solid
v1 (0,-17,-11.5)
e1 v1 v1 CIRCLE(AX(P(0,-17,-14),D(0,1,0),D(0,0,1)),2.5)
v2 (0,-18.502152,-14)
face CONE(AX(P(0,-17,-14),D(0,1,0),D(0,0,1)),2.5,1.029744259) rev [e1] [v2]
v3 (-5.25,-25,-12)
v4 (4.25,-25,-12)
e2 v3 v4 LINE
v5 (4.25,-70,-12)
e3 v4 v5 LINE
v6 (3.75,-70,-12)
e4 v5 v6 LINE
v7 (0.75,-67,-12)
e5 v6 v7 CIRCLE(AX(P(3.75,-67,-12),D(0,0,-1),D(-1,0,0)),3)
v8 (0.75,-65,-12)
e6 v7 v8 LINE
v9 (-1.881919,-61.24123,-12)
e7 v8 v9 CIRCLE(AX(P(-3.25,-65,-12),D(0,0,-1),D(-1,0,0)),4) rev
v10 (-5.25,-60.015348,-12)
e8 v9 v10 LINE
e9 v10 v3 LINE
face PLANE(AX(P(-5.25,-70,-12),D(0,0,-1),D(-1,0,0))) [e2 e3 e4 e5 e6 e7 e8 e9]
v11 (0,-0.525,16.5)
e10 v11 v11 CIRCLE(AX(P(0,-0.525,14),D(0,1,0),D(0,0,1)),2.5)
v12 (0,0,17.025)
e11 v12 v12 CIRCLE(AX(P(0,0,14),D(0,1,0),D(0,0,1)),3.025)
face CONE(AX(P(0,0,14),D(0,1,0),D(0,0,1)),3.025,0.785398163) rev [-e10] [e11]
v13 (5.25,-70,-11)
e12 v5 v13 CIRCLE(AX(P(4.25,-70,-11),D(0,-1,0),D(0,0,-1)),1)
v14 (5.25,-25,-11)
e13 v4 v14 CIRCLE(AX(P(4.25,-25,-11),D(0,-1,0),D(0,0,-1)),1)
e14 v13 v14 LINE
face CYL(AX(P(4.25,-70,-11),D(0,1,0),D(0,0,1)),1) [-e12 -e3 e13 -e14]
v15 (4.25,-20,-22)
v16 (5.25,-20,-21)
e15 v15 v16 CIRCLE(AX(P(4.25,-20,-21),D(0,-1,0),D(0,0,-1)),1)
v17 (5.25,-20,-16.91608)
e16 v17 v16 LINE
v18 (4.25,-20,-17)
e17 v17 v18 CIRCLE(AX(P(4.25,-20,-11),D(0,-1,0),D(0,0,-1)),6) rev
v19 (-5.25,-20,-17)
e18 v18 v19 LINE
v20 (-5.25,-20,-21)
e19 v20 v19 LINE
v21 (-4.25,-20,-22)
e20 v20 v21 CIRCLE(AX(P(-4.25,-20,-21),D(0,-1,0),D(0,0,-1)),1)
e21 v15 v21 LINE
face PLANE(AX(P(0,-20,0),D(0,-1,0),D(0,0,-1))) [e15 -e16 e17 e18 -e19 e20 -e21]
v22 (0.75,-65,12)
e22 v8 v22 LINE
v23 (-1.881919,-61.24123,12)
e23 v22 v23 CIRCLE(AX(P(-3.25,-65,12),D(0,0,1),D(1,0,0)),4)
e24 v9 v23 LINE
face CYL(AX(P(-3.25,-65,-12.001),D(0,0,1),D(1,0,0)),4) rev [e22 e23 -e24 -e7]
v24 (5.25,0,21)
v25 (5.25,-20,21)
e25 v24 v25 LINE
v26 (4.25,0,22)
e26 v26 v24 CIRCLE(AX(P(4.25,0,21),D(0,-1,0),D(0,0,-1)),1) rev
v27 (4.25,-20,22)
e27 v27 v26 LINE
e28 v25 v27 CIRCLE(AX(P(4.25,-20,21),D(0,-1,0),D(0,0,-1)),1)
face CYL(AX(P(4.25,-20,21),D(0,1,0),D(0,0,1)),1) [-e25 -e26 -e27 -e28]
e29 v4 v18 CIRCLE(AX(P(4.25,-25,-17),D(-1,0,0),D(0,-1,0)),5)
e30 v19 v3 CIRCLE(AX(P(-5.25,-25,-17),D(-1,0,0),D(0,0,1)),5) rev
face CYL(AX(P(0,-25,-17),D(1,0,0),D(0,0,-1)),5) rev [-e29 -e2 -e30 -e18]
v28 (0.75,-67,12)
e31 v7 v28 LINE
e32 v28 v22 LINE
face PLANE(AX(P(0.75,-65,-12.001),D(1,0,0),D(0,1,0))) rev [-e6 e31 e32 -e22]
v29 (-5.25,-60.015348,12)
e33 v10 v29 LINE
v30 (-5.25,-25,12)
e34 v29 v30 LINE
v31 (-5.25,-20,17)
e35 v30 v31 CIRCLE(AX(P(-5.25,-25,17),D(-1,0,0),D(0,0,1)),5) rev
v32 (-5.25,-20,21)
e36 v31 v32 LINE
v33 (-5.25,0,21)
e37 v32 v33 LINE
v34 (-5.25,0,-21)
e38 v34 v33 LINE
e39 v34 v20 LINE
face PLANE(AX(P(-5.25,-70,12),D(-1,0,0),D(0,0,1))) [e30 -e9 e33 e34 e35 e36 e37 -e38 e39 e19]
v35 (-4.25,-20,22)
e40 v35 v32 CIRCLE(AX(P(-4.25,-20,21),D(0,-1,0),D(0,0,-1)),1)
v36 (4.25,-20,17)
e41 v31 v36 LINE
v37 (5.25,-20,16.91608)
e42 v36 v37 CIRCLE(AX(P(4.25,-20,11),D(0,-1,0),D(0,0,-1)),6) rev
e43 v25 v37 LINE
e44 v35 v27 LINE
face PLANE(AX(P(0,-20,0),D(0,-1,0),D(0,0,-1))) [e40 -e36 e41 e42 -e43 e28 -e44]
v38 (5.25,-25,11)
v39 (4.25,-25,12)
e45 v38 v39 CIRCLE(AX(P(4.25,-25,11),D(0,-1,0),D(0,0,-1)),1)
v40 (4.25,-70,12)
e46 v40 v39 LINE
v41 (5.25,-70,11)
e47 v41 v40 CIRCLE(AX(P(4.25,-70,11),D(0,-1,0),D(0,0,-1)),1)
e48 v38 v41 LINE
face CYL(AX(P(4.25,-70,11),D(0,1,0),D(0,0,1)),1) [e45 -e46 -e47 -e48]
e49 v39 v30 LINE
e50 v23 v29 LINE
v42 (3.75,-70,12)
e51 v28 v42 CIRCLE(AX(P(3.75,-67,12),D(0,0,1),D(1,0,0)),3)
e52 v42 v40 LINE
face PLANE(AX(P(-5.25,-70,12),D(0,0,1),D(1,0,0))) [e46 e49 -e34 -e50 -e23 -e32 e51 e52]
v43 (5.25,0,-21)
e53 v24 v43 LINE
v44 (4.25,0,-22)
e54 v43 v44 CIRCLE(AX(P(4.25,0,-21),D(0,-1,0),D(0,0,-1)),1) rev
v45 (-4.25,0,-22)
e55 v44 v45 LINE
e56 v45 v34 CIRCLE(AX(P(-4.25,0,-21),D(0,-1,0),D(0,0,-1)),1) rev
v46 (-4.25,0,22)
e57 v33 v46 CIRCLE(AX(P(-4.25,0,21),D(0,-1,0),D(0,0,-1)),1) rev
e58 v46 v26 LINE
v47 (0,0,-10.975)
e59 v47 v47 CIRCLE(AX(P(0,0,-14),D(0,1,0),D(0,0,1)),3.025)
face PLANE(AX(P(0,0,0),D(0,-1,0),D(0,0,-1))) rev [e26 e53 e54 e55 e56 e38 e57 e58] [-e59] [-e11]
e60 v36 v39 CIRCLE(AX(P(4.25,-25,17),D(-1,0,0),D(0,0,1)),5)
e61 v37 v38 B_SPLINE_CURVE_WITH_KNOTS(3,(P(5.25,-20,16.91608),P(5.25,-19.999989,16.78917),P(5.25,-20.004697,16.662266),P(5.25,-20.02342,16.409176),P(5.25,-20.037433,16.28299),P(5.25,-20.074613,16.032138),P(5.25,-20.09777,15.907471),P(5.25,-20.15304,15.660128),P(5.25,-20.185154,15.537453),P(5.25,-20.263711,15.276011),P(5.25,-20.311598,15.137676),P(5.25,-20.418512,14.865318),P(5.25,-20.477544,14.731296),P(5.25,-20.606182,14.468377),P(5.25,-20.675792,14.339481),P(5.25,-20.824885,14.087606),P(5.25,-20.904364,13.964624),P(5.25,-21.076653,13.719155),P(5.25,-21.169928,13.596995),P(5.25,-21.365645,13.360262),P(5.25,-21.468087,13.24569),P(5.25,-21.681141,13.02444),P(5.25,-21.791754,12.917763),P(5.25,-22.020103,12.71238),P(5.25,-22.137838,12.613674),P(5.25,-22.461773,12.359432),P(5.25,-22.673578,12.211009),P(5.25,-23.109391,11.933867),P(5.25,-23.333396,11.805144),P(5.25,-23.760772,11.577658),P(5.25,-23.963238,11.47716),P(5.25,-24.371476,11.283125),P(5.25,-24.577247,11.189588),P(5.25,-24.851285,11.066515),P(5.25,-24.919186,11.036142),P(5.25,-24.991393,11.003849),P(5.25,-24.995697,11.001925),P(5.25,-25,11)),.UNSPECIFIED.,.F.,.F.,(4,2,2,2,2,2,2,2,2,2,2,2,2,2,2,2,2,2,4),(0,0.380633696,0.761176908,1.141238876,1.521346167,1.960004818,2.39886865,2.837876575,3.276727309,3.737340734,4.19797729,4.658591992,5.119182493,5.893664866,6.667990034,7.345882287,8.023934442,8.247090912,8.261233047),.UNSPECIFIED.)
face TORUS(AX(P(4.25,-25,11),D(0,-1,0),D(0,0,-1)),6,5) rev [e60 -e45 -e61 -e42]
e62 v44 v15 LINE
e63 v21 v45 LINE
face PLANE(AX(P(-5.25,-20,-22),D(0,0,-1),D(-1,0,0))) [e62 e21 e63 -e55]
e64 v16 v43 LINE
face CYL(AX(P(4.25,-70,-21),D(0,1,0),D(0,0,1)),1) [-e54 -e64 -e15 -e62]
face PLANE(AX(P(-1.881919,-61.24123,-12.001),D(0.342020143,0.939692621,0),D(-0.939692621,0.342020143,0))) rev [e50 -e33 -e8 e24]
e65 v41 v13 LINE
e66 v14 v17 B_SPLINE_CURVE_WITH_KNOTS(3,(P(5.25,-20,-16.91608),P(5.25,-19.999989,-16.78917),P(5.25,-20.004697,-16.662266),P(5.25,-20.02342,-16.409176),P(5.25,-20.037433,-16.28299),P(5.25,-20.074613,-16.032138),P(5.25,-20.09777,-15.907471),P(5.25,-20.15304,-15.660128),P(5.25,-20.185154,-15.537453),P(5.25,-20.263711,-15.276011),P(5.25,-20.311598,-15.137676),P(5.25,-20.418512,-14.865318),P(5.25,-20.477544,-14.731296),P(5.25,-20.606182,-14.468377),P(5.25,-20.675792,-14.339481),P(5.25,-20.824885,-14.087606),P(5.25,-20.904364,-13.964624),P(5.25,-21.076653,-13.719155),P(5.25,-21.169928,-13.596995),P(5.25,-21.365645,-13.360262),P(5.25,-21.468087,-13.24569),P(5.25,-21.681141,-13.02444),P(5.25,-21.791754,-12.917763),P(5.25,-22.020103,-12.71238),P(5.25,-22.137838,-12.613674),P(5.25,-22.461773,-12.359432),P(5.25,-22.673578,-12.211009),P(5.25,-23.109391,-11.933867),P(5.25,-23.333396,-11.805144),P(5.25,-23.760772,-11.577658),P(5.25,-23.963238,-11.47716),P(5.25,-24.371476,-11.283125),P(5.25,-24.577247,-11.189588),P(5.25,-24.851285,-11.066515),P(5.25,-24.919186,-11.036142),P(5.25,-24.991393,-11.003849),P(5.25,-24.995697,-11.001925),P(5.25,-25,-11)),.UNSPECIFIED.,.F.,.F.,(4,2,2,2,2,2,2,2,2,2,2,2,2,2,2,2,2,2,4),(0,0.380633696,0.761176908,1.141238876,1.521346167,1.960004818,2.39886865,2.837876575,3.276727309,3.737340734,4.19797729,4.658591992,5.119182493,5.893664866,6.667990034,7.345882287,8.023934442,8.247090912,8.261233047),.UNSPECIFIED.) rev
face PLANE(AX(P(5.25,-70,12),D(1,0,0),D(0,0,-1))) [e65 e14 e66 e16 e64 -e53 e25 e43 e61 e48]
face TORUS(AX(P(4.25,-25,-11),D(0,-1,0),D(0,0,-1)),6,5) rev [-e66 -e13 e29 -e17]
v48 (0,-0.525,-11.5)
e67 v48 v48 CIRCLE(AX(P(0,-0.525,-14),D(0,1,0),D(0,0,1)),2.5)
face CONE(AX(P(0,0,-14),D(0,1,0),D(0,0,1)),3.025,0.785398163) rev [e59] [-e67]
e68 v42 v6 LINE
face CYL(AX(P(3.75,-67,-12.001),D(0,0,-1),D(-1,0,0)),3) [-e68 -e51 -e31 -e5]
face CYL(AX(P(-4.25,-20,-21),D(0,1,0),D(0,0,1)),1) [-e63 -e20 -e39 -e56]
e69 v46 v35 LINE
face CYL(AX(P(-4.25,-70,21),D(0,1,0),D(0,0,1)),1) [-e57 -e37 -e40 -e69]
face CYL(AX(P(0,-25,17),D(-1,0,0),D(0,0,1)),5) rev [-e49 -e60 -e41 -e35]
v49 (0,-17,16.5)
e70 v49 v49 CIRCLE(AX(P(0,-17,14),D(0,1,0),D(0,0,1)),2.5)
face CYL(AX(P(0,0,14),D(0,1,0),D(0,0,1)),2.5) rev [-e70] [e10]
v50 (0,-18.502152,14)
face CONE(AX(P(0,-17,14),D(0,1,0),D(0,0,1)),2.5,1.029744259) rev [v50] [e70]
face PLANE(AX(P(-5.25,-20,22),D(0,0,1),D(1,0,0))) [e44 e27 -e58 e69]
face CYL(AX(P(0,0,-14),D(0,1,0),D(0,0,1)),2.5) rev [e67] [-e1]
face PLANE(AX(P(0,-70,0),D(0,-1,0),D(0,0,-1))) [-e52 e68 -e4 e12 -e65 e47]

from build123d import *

# Parameters (mm, degrees)
SKETCH1_W                   = 10.5
SKETCH1_H                   = 24
BOSS_EXTRUDE1_DEPTH         = 70
CUT_EXTRUDE1_REACH          = 76.186
FILLET1_R                   = 3
SKETCH3_W                   = 10.5
SKETCH3_H                   = 44
BOSS_EXTRUDE2_DEPTH         = 20
FILLET2_R                   = 1
M6_TAPPED_HOLE1_D           = 5
M6_TAPPED_HOLE1_DEPTH       = 17
M6_TAPPED_HOLE1_CSINK_D     = 6.05
M6_TAPPED_HOLE1_CSINK_ANGLE = 90
M6_TAPPED_HOLE1_TIP         = 1.502151548
FILLET3_R                   = 5
FILLET4_R                   = 1


with BuildPart() as part:
    # Sketch1 → Boss-Extrude1 (new body)
    with BuildSketch(Plane(origin=(0, 0, 0), x_dir=(1, 0, 0), z_dir=(0, 1, 0))):
        Rectangle(SKETCH1_W, SKETCH1_H)
    extrude(amount=-BOSS_EXTRUDE1_DEPTH)

    # Sketch2 → Cut-Extrude1 (cut, up to next)
    with BuildSketch(Plane.XY.offset(12), mode=Mode.PRIVATE) as cut_extrude1_sk1:
        with BuildLine():
            Line((-1.881919427, -61.241229517), (-5.25, -60.015348442))
            Line((-5.25, -60.015348442), (-5.25, -70))
            Line((-5.25, -70), (0.75, -70))
            Line((0.75, -70), (0.75, -65))
            ThreePointArc((0.75, -65), (0.026608177, -62.705694255), (-1.881919427, -61.241229517))
        make_face()
    cut_extrude1_tool1 = extrude(cut_extrude1_sk1.sketch, amount=-CUT_EXTRUDE1_REACH, mode=Mode.PRIVATE) & part.part
    add(cut_extrude1_tool1.solids().sort_by_distance((-2.443278, -65.612177, 12))[0], mode=Mode.SUBTRACT)

    # Fillet1
    fillet1_edges = [part.edges().sort_by_distance(p)[0] for p in [
        (0.75, -70, 0),
    ]]
    fillet(fillet1_edges, radius=FILLET1_R)

    # Sketch3 → Boss-Extrude2 (add)
    with BuildSketch(Plane(origin=(0, 0, 0), x_dir=(1, 0, 0), z_dir=(0, 1, 0))):
        Rectangle(SKETCH3_W, SKETCH3_H)
    extrude(amount=-BOSS_EXTRUDE2_DEPTH)

    # Fillet2
    fillet2_edges = [part.edges().sort_by_distance(p)[0] for p in [
        (5.25, -45, 12),
        (5.25, -45, -12),
    ]]
    fillet(fillet2_edges, radius=FILLET2_R)

    # M6 Tapped Hole1
    with Locations(Plane(origin=(0, 0, 0), x_dir=(1, 0, 0), z_dir=(0, 1, 0))):
        with Locations((0, 14), (0, -14)):
            CounterSinkHole(M6_TAPPED_HOLE1_D / 2, M6_TAPPED_HOLE1_CSINK_D / 2, depth=M6_TAPPED_HOLE1_DEPTH, counter_sink_angle=M6_TAPPED_HOLE1_CSINK_ANGLE)
            with Locations((0, 0, -(M6_TAPPED_HOLE1_DEPTH + M6_TAPPED_HOLE1_TIP / 2))):  # 118° drill point
                Cone(0, M6_TAPPED_HOLE1_D / 2, M6_TAPPED_HOLE1_TIP, mode=Mode.SUBTRACT)

    # Fillet3
    # the kernel refuses this fillet: 5 mm, written as the material it adds along each edge
    with BuildSketch(Plane(origin=(4.25, -20, 12), x_dir=(0, -1, 0), z_dir=(-1, 0, 0)), Plane(origin=(-5.25, -20, -12), x_dir=(0, -1, 0), z_dir=(1, 0, 0))) as fillet3_piece_1:
        with BuildLine():
            CenterArc((FILLET3_R, FILLET3_R), FILLET3_R, 180, 90)
            Line((0, FILLET3_R), (0, 0))
            Line((0, 0), (FILLET3_R, 0))
        make_face()
    extrude(amount=9.5)
    with BuildSketch(Plane(origin=(4.25, -20, -11), x_dir=(0, 0, -1), z_dir=(-1, 0, 0))) as fillet3_piece_2_section:
        with BuildLine():
            CenterArc((1 + FILLET3_R, FILLET3_R), FILLET3_R, 180, 90)
            Line((1, FILLET3_R), (1, 0))
            Line((1, 0), (1 + FILLET3_R, 0))
        make_face()
    fillet3_piece_2 = revolve(axis=Axis((4.25, -20, -11), (0, -1, 0)), revolution_arc=359.64, mode=Mode.PRIVATE)
    fillet3_piece_2 = split(fillet3_piece_2, bisect_by=Plane(origin=(5.25, -21.017365057, -13.137521002), z_dir=(-1, 0, 0)), keep=Keep.TOP, mode=Mode.PRIVATE)
    add(fillet3_piece_2)
    with BuildSketch(Plane(origin=(4.25, -20, 11), x_dir=(0, 0, 1), z_dir=(-1, 0, 0))) as fillet3_piece_3_section:
        with BuildLine():
            CenterArc((1 + FILLET3_R, -FILLET3_R), FILLET3_R, 90, 90)
            Line((1 + FILLET3_R, 0), (1, 0))
            Line((1, 0), (1, -FILLET3_R))
        make_face()
    fillet3_piece_3 = revolve(axis=Axis((4.25, -20, 11), (0, 1, 0)), revolution_arc=359.64, mode=Mode.PRIVATE)
    fillet3_piece_3 = split(fillet3_piece_3, bisect_by=Plane(origin=(5.25, -22.017645533, 11.767475003), z_dir=(-1, 0, 0)), keep=Keep.TOP, mode=Mode.PRIVATE)
    add(fillet3_piece_3)

    # Fillet4
    fillet4_edges = [part.edges().sort_by_distance(p)[0] for p in [
        (-5.25, -10, 22),
        (-5.25, -10, -22),
        (5.25, -10, -22),
        (5.25, -10, 22),
    ]]
    fillet(fillet4_edges, radius=FILLET4_R)


solid = part.part
